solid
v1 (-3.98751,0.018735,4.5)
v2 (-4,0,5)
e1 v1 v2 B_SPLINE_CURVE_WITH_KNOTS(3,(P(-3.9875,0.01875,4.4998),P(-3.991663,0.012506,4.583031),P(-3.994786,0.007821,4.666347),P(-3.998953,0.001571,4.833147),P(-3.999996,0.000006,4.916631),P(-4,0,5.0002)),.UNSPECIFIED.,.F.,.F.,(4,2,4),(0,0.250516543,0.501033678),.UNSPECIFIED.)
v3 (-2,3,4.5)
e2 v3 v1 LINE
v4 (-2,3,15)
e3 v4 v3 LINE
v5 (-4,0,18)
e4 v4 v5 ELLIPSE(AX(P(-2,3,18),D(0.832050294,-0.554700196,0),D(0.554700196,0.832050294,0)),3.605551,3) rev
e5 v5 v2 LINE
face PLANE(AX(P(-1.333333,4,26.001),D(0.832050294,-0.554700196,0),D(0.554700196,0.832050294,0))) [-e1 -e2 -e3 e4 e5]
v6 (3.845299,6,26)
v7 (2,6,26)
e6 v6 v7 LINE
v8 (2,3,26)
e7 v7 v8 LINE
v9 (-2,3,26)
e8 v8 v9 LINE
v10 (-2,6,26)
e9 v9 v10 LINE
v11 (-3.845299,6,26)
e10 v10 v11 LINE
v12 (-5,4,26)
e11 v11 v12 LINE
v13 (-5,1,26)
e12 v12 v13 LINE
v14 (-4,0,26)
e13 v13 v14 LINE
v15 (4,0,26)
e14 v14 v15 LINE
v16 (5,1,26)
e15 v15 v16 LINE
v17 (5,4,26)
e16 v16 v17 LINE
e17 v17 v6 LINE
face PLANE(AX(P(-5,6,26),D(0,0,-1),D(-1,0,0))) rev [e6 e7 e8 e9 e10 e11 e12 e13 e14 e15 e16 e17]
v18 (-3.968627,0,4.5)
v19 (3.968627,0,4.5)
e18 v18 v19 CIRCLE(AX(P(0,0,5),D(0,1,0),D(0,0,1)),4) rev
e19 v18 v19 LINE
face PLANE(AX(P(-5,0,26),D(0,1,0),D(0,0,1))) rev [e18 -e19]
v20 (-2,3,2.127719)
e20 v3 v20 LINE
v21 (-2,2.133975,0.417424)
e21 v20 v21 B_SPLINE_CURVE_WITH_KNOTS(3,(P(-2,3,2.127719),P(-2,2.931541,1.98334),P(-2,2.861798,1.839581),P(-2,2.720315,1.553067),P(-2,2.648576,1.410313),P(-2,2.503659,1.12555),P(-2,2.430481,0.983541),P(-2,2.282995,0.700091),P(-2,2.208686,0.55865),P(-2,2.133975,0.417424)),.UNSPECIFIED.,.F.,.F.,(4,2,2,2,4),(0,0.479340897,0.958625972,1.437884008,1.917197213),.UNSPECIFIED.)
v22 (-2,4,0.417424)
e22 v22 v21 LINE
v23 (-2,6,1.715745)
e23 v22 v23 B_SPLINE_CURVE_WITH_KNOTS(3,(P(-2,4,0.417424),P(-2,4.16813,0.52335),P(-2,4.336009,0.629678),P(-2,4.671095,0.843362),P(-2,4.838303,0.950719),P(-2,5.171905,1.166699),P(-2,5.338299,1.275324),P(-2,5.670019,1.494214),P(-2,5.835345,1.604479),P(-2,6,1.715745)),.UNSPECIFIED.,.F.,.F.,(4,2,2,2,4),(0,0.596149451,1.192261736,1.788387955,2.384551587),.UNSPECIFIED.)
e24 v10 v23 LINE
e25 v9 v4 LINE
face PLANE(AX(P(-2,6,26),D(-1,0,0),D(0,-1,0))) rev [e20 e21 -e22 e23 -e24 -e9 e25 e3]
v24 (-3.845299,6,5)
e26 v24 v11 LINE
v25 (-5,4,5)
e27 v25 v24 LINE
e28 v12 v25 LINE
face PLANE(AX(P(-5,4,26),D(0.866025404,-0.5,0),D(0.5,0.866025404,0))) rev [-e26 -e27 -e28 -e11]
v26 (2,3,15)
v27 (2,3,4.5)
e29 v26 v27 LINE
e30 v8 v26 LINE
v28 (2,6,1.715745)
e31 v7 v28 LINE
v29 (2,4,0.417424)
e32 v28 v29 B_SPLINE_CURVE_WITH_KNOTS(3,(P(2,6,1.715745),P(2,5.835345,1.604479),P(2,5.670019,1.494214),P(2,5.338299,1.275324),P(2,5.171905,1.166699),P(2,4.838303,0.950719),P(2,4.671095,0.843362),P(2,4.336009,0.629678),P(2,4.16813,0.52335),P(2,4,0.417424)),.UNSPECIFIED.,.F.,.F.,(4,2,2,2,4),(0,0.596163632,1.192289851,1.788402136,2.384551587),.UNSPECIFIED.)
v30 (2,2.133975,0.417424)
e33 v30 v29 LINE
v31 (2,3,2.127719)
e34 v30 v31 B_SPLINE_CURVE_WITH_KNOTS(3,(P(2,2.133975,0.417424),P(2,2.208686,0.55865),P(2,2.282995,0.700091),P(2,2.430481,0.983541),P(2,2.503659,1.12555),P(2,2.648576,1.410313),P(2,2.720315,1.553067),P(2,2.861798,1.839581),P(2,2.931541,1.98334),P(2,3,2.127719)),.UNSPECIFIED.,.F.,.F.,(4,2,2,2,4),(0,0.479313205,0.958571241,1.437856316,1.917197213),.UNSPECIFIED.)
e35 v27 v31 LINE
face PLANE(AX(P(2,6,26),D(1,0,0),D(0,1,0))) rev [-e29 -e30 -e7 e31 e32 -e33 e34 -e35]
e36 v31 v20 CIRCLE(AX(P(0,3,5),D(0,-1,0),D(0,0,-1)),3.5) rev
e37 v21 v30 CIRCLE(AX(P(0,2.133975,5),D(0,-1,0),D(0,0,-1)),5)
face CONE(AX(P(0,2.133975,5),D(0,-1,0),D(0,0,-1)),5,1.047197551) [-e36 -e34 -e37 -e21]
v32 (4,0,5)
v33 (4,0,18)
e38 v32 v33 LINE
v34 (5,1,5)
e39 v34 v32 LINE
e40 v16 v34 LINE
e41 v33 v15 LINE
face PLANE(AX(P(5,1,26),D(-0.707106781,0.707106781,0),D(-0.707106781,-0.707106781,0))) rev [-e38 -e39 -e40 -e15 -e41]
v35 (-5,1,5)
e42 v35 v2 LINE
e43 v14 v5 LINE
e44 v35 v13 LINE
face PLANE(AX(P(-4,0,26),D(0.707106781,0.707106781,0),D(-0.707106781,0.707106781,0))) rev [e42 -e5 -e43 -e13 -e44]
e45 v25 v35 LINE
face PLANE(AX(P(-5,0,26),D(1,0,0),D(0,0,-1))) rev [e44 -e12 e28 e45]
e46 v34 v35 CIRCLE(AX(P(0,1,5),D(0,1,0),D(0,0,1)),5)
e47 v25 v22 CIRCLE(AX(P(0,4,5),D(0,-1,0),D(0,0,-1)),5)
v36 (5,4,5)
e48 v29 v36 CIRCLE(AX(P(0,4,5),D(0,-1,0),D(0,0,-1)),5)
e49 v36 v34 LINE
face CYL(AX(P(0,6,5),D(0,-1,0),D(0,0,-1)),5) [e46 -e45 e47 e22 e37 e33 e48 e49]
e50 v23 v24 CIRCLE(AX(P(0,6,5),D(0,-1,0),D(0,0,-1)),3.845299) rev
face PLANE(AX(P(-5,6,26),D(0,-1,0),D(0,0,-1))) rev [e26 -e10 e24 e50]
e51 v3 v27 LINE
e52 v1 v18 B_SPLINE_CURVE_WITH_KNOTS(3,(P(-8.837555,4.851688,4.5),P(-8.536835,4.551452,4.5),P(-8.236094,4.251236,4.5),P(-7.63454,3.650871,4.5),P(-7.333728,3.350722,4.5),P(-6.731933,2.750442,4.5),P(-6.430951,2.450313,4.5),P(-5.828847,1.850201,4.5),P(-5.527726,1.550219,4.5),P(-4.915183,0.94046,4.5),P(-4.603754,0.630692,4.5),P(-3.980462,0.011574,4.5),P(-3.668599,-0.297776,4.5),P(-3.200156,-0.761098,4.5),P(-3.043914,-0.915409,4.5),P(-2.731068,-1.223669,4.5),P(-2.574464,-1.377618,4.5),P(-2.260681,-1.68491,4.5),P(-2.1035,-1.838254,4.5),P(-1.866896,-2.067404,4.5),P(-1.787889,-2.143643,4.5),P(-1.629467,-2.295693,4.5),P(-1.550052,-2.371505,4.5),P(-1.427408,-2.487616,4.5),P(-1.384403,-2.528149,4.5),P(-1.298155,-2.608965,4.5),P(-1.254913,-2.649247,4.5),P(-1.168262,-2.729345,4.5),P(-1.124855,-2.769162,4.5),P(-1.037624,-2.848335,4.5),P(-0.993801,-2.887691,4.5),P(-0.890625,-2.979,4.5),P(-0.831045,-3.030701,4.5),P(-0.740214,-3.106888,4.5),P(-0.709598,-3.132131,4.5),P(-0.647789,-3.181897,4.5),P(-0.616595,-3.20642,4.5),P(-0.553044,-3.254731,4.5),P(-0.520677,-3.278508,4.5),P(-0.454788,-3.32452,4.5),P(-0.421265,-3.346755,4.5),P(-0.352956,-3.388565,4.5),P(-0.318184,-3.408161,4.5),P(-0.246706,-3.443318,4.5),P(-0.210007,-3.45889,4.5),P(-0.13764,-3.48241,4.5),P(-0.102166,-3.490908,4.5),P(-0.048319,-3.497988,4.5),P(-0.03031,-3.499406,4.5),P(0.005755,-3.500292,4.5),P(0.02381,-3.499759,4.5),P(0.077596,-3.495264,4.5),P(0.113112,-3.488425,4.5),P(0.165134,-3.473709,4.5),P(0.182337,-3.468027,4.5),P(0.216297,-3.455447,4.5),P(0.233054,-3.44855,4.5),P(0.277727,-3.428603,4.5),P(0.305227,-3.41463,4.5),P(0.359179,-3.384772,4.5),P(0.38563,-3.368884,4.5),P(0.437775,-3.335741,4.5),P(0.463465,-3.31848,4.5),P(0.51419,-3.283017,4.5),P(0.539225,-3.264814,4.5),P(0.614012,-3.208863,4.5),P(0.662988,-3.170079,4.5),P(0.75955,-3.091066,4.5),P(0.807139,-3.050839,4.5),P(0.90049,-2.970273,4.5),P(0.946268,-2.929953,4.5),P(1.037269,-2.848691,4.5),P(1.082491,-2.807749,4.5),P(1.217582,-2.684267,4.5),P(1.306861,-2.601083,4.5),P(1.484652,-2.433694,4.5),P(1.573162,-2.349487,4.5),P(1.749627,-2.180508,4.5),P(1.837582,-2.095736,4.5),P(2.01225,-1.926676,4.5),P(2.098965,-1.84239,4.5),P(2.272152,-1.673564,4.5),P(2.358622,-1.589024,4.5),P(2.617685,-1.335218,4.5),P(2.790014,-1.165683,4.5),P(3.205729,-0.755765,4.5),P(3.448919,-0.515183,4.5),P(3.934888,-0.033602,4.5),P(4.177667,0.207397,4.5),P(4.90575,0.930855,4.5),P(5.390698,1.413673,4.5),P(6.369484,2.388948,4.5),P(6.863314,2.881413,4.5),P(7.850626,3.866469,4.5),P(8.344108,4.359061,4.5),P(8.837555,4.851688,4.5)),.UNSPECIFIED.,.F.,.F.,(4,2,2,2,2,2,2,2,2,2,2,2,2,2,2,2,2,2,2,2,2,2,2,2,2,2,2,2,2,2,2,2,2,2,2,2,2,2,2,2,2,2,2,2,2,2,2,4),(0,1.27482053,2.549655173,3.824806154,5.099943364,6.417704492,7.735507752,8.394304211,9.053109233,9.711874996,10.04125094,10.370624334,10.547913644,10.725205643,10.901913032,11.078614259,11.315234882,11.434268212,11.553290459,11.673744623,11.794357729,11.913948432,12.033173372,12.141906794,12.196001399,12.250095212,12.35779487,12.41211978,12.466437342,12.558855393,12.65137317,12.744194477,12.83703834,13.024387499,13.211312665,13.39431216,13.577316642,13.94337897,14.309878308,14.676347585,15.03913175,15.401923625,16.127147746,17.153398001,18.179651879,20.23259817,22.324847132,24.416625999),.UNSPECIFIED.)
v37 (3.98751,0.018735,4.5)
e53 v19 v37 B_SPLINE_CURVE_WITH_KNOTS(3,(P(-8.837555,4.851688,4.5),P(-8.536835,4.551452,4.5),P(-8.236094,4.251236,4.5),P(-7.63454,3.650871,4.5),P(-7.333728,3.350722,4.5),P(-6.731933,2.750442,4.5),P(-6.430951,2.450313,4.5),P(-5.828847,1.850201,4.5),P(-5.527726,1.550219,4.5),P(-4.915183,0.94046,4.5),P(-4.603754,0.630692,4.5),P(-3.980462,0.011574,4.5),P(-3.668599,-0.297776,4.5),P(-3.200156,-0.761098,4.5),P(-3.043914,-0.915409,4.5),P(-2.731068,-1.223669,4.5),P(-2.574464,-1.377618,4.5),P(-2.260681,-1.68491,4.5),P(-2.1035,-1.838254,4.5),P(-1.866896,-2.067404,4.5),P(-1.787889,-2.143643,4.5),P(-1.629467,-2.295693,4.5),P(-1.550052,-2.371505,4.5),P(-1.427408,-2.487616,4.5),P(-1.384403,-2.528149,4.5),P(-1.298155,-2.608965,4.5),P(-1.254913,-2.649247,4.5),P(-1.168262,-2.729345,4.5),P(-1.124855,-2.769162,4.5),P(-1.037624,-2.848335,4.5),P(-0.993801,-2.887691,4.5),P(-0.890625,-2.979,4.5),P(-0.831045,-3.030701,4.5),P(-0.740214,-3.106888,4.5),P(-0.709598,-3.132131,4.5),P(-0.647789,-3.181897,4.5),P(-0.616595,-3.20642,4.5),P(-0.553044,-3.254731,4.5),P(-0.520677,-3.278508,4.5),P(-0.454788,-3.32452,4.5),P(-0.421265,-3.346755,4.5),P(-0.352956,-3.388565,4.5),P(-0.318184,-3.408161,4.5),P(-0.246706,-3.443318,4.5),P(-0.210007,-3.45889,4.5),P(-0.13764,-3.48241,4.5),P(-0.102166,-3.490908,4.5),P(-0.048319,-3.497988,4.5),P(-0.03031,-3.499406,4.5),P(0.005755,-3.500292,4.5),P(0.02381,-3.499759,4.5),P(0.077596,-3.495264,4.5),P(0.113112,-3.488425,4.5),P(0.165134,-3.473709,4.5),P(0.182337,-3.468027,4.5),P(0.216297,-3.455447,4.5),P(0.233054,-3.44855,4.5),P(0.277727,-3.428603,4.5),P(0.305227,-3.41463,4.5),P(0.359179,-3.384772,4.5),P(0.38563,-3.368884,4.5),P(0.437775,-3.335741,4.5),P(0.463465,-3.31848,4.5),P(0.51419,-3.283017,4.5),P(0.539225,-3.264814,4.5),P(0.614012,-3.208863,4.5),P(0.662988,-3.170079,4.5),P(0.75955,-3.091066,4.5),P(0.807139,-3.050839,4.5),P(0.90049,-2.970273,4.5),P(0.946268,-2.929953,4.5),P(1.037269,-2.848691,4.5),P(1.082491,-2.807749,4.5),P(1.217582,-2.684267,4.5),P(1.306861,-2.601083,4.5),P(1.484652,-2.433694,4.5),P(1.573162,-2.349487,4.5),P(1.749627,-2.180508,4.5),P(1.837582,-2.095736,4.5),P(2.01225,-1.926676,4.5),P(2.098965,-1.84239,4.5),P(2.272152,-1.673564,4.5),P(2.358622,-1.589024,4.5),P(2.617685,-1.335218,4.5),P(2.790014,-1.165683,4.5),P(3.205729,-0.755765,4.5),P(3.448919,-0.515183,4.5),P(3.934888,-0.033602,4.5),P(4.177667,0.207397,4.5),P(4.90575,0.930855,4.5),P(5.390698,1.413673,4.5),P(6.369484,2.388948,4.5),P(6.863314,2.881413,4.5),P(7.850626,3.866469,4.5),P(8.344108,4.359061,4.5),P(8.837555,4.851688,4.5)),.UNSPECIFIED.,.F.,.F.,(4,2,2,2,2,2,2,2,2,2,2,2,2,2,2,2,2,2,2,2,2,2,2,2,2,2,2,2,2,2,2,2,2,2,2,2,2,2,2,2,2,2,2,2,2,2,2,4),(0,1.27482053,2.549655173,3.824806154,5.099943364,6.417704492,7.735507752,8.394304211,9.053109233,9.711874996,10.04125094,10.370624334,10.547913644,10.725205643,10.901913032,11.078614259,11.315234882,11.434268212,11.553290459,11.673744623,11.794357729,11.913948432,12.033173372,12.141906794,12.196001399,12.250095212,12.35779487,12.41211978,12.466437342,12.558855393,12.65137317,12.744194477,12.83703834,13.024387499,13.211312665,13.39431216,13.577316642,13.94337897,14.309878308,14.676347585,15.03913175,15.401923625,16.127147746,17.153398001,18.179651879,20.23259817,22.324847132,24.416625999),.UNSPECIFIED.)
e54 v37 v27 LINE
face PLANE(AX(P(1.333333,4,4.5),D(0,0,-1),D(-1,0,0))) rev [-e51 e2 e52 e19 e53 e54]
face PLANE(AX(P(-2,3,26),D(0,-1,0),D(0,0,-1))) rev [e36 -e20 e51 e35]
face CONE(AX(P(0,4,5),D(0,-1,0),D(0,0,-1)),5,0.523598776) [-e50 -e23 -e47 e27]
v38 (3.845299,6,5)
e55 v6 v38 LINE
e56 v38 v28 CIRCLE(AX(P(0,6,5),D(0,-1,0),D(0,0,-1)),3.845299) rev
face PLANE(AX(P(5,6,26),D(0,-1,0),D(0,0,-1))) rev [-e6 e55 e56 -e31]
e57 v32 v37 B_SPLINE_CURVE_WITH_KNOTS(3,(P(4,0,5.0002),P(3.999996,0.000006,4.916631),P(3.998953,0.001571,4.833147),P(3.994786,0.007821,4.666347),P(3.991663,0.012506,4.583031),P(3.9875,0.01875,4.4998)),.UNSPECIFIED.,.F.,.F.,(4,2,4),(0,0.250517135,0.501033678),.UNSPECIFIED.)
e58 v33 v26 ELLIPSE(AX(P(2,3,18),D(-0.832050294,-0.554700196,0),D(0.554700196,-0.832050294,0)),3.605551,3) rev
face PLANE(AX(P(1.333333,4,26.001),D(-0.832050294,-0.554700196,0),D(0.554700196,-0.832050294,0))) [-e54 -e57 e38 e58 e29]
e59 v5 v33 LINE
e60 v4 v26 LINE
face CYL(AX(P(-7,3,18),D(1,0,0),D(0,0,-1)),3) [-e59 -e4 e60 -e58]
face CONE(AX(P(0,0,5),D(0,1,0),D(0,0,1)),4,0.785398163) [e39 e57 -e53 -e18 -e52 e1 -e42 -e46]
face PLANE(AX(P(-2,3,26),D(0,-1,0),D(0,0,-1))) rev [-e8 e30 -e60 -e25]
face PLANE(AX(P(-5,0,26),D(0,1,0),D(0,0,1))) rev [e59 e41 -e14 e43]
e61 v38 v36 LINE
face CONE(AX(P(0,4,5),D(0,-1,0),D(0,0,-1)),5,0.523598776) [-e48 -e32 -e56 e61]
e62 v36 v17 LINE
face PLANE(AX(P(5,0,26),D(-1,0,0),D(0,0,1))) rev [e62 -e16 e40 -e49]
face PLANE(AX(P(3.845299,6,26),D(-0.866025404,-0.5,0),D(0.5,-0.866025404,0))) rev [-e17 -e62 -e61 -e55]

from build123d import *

# Parameters (mm, degrees)
EXTRUDE2_DEPTH                 = 26
CUT_EXTRUDE3_DEPTH             = 28.147743921
CHAMFER1_SIZE                  = 1
CHAMFER2_SIZE2                 = 1.154700538
CHAMFER2_SIZE                  = 2
CHAMFER3_SIZE2                 = 1.154700538
CHAMFER3_SIZE                  = 2
CHAMFER4_SIZE                  = 1.5
CHAMFER4_SIZE2                 = 0.866025404
CUT_EXTRUDE5_REACH             = 29.148
CUT_EXTRUDE5_DIRECTION_2_REACH = 29.148
CUT_EXTRUDE6_START             = 4.5
CUT_EXTRUDE6_DEPTH             = 10.5
CUT_EXTRUDE6_START_2           = 15
CUT_EXTRUDE6_2_DEPTH           = 3
CUT_EXTRUDE6_START_3           = -4
CUT_EXTRUDE6_3_DEPTH           = 8


with BuildPart() as part:
    # Sketch1 → Extrude2 (new body)
    with BuildSketch(Plane.XY):
        Polygon((-5, 0), (5, 0), (5, 6), (2, 6), (2, 3), (-2, 3), (-2, 6), (-5, 6), align=None)
    extrude(amount=EXTRUDE2_DEPTH)

    # Sketch2 → Cut-Extrude3 (cut, through all)
    with BuildSketch(Plane(origin=(0, 0, 0), x_dir=(1, 0, 0), z_dir=(0, 1, 0))):
        with BuildLine():
            Line((-5, 1), (5, 1))
            Line((5, 1), (5, -5))
            ThreePointArc((5, -5), (0, 0), (-5, -5))
            Line((-5, -5), (-5, 1))
        make_face()
    extrude(amount=CUT_EXTRUDE3_DEPTH, mode=Mode.SUBTRACT)

    # Chamfer1
    chamfer1_edges = [part.edges().sort_by_distance(p)[0] for p in [
        (5, 0, 15.5),
        (-5, 0, 15.5),
        (0, 0, 0),
    ]]
    chamfer(chamfer1_edges, length=CHAMFER1_SIZE)

    # Chamfer2
    chamfer2_edges = [part.edges().sort_by_distance(p)[0] for p in [
        (5, 6, 15.5),
        (4.183300133, 6, 2.261387212),
    ]]
    chamfer(chamfer2_edges, length=CHAMFER2_SIZE, length2=CHAMFER2_SIZE2)

    # Chamfer3
    chamfer3_edges = [part.edges().sort_by_distance(p)[0] for p in [
        (-5, 6, 15.5),
        (-4.183300133, 6, 2.261387212),
    ]]
    chamfer(chamfer3_edges, length=CHAMFER3_SIZE, length2=CHAMFER3_SIZE2)

    # Chamfer4
    chamfer4_edges = [part.edges().sort_by_distance(p)[0] for p in [
        (0, 3, 0),
    ]]
    chamfer4_side = [part.faces().sort_by_distance(p)[0] for p in [
        (0, 3, 13.068070345),
    ]]
    chamfer(chamfer4_edges, length=CHAMFER4_SIZE, length2=CHAMFER4_SIZE2, reference=chamfer4_side[0])

    # Cut-Extrude5: up to this face of the body (flat: up to its plane)
    cut_extrude5_end = Plane(part.part.faces().sort_by_distance((-2, 4.468849855, 13.300187557))[0])
    # Sketch5 → Cut-Extrude5 (cut, up to the picked face)
    with BuildSketch(Plane(origin=(0, 0, 0), x_dir=(0, 0, -1), z_dir=(1, 0, 0)), mode=Mode.PRIVATE) as cut_extrude5_sk1:
        with BuildLine():
            Line((-15, 3), (-14, 3))
            Line((-14, 3), (-14, 0))
            Line((-14, 0), (-18, 0))
            ThreePointArc((-18, 0), (-15.878679656, 0.878679656), (-15, 3))
        make_face()
    cut_extrude5_tool1 = split(extrude(cut_extrude5_sk1.sketch, amount=-CUT_EXTRUDE5_REACH, mode=Mode.PRIVATE), bisect_by=cut_extrude5_end, keep=Keep.BOTH, mode=Mode.PRIVATE)
    add(cut_extrude5_tool1.solids().sort_by(Axis((0, 1.174967, 14.958278), (-1, 0, 0)))[0], mode=Mode.SUBTRACT)

    # Cut-Extrude5 direction 2: up to this face of the body (flat: up to its plane)
    cut_extrude5_direction_2_end = Plane(part.part.faces().sort_by_distance((2, 4.468849855, 13.300187557))[0])
    # Sketch5 → Cut-Extrude5 direction 2 (cut, up to the picked face)
    with BuildSketch(Plane(origin=(0, 0, 0), x_dir=(0, 0, -1), z_dir=(1, 0, 0)), mode=Mode.PRIVATE) as cut_extrude5_direction_2_sk1:
        with BuildLine():
            Line((-15, 3), (-14, 3))
            Line((-14, 3), (-14, 0))
            Line((-14, 0), (-18, 0))
            ThreePointArc((-18, 0), (-15.878679656, 0.878679656), (-15, 3))
        make_face()
    cut_extrude5_direction_2_tool1 = split(extrude(cut_extrude5_direction_2_sk1.sketch, amount=CUT_EXTRUDE5_DIRECTION_2_REACH, mode=Mode.PRIVATE), bisect_by=cut_extrude5_direction_2_end, keep=Keep.BOTH, mode=Mode.PRIVATE)
    add(cut_extrude5_direction_2_tool1.solids().sort_by(Axis((0, 1.174967, 14.958278), (1, 0, 0)))[0], mode=Mode.SUBTRACT)

    # Cut-Extrude6: read off the stored shape, not the designer's step
    # Cut-Extrude6 outline → Cut-Extrude6 (cut)
    with BuildSketch(Plane.XY.offset(CUT_EXTRUDE6_START)):
        Polygon((-2, 3), (-4, 0), (4, 0), (2, 3), align=None)
    extrude(amount=CUT_EXTRUDE6_DEPTH, mode=Mode.SUBTRACT)

    # Cut-Extrude6 2 outline → Cut-Extrude6 2 (cut)
    with BuildSketch(Plane.XY.offset(CUT_EXTRUDE6_START_2)):
        Polygon((2, 3), (2, 0), (4, 0), align=None)
        Polygon((-2, 3), (-4, 0), (-2, 0), align=None)
    extrude(amount=CUT_EXTRUDE6_2_DEPTH, mode=Mode.SUBTRACT)

    # Cut-Extrude6 3 outline → Cut-Extrude6 3 (add)
    with BuildSketch(Plane.YZ.offset(CUT_EXTRUDE6_START_3)):
        with BuildLine():
            ThreePointArc((0, 18), (0.878679656, 15.878679656), (3, 15))
            Line((3, 15), (3, 18))
            Line((3, 18), (0, 18))
        make_face()
    extrude(amount=CUT_EXTRUDE6_3_DEPTH)


solid = part.part
